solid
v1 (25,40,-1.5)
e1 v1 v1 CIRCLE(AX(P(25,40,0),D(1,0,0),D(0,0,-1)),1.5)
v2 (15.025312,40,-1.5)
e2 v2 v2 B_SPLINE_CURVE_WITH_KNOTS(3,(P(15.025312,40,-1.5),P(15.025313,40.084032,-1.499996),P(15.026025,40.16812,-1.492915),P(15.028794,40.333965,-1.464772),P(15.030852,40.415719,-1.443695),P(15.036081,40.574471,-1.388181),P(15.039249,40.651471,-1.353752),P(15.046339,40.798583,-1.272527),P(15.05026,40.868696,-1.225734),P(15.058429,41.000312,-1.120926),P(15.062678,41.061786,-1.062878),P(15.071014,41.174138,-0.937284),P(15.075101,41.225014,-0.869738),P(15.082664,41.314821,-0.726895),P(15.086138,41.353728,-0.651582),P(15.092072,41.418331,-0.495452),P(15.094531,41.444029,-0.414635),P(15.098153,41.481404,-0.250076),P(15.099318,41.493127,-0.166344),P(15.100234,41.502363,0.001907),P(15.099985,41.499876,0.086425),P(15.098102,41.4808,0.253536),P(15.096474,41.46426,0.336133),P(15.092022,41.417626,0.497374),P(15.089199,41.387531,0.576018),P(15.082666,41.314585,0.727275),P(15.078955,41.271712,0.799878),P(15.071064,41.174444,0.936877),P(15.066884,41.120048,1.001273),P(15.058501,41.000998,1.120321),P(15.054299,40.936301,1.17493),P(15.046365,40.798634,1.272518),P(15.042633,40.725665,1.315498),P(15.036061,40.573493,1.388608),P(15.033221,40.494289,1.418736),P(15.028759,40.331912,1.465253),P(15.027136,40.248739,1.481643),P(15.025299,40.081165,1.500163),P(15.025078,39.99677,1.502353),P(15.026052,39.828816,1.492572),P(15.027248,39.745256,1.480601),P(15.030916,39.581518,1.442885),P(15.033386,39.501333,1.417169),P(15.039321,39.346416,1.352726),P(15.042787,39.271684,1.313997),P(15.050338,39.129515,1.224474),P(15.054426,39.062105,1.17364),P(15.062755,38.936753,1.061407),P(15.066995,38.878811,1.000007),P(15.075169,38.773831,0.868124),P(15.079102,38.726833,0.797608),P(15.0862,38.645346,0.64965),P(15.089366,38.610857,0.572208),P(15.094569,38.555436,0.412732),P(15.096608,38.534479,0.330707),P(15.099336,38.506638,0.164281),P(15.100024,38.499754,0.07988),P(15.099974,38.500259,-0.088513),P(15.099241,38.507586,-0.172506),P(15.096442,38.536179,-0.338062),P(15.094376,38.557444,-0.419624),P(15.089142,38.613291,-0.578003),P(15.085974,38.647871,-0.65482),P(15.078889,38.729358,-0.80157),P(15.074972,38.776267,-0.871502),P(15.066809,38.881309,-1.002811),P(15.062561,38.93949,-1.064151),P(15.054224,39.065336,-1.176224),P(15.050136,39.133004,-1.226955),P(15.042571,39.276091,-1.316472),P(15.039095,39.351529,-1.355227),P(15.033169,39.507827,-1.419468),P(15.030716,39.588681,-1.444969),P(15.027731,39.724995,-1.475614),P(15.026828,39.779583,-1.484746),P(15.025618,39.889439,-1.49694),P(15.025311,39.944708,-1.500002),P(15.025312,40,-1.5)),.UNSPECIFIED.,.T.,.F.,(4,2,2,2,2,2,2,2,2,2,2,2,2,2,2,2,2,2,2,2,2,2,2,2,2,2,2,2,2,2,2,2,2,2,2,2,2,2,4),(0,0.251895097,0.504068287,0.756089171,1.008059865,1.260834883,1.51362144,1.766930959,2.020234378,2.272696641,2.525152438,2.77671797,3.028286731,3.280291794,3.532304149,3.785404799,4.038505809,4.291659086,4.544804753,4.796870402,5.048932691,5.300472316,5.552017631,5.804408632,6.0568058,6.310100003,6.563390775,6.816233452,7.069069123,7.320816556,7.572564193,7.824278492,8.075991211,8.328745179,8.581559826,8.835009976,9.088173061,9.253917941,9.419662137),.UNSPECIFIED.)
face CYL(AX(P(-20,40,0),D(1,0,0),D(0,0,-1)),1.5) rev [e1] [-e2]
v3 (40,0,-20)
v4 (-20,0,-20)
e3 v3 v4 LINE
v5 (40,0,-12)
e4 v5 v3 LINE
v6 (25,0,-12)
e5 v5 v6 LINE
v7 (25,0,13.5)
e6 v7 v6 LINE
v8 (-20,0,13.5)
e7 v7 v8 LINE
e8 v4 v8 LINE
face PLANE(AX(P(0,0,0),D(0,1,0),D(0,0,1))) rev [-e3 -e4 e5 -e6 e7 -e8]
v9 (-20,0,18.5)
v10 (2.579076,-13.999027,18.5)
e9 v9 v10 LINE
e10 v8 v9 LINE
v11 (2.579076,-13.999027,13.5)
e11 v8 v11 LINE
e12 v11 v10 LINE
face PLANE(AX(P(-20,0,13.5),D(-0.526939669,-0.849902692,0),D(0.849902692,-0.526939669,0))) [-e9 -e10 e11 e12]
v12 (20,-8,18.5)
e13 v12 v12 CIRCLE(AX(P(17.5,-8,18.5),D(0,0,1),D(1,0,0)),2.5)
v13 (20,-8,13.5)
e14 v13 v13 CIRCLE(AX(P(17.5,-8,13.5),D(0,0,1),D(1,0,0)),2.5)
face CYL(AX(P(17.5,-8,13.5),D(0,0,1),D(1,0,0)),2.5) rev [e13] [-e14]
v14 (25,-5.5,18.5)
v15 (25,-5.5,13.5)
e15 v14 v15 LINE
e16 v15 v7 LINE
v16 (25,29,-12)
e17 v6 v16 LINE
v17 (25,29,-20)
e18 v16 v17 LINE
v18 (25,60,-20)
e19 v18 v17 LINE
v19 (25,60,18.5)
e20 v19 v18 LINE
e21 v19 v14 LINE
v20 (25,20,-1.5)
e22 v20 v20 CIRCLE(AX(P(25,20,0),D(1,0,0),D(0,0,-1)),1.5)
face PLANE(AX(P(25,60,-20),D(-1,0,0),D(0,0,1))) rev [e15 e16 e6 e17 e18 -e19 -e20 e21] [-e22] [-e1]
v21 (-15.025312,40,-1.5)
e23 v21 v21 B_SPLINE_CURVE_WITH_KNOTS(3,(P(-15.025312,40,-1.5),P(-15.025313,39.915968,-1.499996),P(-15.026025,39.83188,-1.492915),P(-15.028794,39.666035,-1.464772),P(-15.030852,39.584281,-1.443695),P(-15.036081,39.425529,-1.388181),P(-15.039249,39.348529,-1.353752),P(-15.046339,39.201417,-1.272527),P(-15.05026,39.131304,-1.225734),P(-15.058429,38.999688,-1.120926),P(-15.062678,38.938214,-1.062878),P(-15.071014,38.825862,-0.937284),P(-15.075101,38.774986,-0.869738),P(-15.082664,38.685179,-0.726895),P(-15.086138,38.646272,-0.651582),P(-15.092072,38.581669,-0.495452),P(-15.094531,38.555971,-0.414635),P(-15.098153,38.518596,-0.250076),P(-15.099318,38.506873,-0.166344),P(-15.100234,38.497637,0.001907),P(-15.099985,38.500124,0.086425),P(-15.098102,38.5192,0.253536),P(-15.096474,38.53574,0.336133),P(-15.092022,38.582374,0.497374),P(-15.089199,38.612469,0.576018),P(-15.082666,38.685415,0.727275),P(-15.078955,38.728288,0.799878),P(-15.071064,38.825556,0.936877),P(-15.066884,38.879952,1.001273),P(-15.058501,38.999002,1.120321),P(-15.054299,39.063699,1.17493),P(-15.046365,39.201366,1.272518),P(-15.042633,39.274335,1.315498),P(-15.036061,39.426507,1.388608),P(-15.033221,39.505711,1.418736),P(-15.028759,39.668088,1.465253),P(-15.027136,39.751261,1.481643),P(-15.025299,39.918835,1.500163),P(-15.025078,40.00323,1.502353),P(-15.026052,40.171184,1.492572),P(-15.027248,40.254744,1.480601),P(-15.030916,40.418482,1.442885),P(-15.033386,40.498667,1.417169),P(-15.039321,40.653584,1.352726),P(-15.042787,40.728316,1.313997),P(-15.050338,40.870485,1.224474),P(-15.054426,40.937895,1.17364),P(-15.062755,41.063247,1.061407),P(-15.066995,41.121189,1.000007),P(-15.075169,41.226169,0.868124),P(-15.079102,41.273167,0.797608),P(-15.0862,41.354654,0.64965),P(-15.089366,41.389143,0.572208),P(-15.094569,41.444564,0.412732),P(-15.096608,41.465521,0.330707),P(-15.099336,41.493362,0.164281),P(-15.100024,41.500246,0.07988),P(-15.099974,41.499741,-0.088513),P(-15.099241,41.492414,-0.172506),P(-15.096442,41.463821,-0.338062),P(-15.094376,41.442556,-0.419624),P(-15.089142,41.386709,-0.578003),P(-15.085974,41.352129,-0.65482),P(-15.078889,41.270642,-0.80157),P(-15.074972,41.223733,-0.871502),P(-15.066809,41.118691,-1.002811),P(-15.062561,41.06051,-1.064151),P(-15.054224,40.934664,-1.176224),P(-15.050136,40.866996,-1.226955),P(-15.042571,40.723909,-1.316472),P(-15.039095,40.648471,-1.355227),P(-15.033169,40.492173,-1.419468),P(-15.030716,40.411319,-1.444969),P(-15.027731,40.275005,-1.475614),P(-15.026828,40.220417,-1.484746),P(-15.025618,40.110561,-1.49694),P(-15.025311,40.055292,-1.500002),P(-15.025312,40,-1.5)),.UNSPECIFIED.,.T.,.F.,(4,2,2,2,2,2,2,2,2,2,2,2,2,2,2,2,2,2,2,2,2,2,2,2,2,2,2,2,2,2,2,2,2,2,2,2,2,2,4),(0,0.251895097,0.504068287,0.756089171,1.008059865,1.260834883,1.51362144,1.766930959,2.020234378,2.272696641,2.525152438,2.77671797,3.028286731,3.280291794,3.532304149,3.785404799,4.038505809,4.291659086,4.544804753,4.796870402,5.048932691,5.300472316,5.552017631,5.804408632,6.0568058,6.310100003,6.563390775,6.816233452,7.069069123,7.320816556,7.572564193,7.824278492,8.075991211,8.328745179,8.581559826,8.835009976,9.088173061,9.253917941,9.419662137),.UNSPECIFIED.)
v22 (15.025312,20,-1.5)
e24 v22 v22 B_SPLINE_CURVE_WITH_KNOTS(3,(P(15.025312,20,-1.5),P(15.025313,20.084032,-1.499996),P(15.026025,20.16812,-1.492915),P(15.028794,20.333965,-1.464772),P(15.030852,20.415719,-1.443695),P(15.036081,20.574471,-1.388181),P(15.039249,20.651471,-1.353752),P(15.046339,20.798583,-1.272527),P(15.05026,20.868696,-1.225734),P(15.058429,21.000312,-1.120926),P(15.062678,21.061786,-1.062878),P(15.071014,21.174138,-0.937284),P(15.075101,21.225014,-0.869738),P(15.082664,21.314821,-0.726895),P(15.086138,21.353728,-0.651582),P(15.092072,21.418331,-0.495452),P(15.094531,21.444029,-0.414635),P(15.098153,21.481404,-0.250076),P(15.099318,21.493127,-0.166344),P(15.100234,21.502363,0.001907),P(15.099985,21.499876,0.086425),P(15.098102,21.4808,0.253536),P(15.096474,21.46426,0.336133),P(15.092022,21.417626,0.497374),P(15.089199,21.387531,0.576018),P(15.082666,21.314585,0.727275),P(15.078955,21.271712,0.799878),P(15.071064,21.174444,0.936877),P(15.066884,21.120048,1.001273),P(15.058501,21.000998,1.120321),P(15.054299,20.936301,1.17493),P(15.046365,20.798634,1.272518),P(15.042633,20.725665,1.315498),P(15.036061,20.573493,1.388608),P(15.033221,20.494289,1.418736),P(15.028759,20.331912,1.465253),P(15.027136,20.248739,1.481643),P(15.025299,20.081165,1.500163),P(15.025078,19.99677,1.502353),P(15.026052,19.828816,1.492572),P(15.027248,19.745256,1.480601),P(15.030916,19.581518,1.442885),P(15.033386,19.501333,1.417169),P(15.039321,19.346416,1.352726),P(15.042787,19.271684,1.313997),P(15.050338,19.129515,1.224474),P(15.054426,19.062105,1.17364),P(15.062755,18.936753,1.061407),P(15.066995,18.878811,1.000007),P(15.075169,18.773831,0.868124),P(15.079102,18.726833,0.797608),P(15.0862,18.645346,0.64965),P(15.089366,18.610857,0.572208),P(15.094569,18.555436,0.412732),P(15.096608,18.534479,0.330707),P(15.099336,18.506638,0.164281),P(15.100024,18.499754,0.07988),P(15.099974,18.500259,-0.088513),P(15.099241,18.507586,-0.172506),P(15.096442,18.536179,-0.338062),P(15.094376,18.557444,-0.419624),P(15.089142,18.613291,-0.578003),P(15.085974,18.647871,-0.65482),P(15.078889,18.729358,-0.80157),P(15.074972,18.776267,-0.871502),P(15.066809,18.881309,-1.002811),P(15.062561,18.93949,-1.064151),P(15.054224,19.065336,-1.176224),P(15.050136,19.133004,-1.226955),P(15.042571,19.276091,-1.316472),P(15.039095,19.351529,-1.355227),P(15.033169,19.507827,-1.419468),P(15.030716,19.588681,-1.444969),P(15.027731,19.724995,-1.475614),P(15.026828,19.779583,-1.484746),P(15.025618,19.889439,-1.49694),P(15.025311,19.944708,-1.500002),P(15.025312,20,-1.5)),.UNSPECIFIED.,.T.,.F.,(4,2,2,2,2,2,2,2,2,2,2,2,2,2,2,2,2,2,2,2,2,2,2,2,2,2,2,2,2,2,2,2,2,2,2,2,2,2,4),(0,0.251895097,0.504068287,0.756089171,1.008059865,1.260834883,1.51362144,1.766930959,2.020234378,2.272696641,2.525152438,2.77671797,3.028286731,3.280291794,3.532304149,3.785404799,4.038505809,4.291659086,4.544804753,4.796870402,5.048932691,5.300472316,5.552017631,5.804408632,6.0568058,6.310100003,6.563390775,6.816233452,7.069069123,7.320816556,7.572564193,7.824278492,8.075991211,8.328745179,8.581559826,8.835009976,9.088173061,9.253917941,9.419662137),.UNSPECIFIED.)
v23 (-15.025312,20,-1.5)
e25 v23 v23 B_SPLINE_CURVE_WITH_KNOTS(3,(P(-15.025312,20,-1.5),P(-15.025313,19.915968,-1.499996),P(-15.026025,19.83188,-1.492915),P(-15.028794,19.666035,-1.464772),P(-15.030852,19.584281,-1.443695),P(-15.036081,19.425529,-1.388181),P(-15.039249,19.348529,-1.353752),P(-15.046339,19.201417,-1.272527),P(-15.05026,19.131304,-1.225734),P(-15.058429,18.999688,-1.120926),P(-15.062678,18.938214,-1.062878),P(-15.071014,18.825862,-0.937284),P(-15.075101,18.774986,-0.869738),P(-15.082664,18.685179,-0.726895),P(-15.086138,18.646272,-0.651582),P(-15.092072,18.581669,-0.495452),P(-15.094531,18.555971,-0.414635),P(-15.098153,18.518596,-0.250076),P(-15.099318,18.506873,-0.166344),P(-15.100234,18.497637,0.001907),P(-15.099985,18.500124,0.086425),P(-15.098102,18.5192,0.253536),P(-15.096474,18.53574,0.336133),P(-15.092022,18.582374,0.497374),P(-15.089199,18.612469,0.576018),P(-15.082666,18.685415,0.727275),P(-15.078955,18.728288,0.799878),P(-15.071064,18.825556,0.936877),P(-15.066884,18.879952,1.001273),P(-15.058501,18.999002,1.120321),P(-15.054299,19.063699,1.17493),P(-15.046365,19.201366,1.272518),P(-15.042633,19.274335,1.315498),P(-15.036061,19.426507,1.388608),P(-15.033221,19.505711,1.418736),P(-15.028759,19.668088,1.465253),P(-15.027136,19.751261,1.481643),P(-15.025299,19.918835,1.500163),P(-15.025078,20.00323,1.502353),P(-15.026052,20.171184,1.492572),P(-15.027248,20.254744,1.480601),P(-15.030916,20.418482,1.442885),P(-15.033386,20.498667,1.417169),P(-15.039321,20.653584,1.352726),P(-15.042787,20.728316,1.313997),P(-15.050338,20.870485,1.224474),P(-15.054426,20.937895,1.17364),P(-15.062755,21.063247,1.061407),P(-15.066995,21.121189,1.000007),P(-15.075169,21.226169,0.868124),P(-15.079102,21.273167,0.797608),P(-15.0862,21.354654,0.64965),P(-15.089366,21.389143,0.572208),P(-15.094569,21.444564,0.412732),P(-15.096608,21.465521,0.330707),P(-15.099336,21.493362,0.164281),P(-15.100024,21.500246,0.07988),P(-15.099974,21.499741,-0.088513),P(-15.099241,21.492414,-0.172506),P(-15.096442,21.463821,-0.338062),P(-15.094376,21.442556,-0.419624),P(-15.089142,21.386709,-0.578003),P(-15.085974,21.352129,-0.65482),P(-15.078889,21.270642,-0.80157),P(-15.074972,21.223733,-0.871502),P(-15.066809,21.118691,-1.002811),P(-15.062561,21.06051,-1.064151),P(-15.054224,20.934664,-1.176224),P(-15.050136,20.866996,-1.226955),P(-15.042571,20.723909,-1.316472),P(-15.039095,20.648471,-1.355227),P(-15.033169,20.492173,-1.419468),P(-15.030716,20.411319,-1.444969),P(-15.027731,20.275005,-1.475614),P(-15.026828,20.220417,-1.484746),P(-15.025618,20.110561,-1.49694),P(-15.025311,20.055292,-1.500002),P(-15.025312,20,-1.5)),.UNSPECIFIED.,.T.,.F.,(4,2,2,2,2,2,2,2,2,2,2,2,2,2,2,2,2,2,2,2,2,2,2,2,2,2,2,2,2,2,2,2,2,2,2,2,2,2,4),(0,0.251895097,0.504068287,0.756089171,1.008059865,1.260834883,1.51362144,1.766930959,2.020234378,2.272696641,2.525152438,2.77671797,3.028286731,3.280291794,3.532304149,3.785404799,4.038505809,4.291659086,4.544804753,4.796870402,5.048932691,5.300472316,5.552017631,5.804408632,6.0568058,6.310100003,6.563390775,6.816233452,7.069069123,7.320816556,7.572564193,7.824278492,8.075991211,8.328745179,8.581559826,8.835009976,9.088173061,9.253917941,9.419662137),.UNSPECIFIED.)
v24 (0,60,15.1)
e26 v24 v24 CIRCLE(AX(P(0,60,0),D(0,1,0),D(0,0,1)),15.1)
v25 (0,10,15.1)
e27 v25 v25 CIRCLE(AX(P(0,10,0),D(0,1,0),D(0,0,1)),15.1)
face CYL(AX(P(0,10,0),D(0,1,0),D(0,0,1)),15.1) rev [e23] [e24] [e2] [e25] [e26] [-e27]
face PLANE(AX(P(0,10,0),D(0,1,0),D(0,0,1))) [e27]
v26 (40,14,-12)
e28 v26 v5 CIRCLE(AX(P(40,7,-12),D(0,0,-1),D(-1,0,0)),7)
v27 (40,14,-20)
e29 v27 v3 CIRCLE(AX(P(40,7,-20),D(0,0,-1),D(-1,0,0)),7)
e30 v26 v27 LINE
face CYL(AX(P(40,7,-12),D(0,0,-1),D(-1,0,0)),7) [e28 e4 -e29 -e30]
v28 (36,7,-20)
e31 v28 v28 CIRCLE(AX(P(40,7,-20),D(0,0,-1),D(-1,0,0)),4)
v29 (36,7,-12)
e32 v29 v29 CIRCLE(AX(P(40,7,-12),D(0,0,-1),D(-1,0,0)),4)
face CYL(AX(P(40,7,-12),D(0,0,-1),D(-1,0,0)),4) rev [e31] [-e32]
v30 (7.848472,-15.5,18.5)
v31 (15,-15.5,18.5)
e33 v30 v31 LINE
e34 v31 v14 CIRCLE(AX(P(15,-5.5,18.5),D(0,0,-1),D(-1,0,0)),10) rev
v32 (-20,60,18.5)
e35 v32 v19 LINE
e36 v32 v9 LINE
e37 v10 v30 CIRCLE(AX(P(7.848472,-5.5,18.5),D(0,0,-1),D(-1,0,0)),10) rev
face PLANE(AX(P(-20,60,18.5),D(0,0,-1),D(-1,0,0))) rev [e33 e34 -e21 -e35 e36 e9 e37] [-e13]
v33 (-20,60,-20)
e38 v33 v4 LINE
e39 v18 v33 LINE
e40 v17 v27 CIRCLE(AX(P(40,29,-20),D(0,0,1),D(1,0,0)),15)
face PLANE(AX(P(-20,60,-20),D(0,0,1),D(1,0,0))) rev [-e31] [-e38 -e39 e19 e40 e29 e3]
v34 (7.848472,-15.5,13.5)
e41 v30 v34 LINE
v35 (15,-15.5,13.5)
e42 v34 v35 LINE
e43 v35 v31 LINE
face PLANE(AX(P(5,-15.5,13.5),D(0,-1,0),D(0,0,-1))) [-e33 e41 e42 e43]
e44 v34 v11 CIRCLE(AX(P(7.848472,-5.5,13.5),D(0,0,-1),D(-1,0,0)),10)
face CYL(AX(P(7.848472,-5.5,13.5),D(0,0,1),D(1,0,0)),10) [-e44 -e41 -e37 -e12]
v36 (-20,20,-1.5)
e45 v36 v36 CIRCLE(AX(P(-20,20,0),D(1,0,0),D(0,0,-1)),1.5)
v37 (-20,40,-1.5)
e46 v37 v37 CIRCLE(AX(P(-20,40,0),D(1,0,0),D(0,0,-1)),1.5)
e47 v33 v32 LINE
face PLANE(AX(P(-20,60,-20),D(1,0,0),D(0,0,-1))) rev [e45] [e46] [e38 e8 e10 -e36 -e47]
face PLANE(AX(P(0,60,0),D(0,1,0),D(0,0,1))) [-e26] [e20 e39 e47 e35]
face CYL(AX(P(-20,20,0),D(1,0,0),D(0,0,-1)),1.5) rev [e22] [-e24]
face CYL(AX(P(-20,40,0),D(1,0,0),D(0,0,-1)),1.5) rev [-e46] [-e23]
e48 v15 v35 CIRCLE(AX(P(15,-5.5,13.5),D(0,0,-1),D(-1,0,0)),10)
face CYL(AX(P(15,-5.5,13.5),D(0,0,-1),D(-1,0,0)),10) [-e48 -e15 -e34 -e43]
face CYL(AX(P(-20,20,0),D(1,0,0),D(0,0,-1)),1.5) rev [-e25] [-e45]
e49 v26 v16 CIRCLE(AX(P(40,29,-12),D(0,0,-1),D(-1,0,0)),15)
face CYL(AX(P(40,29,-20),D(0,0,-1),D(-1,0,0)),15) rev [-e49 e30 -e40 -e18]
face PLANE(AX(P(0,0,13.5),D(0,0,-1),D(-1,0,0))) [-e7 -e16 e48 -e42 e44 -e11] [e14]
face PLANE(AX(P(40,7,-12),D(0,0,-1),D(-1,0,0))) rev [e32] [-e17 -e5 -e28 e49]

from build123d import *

# Parameters (mm, degrees)
SKETCH_1_W             = 45
SKETCH_1_H             = 38.5
EXTRUDE_1_DEPTH        = 60
SKETCH_2_R             = 15.1
CUT_EXTRUDE_1_DEPTH    = 50
SKETCH_3_R             = 2.5
EXTRUDE_2_DEPTH        = 5
SKETCH_4_R             = 1.5
CUT_EXTRUDE_2_DEPTH    = 78.620873481
PATTERN_LINEAR_1_COUNT = 2
PATTERN_LINEAR_1_PITCH = 20
FILLET_1_R             = 10
SKETCH_5_R             = 4
EXTRUDE_3_DEPTH        = 8
FILLET_2_R             = 15


with BuildPart() as part:
    # 草圖1 → 填料-伸長1 (new body)
    with BuildSketch(Plane(origin=(0, 0, 0), x_dir=(1, 0, 0), z_dir=(0, 1, 0))):
        with Locations((2.5, 0.75)):
            Rectangle(SKETCH_1_W, SKETCH_1_H)
    extrude(amount=EXTRUDE_1_DEPTH)

    # 草圖2 → 除料-伸長1 (cut)
    with BuildSketch(Plane(origin=(0, 60, 0), x_dir=(1, 0, 0), z_dir=(0, 1, 0))):
        with Locations(Location((0, 0, 0), (0, 0, 270))):
            Circle(SKETCH_2_R)
    extrude(amount=-CUT_EXTRUDE_1_DEPTH, mode=Mode.SUBTRACT)

    # 草圖3 → 填料-伸長2 (add)
    with BuildSketch(Plane.XY.offset(18.5)):
        Polygon((-20, 0), (5, -15.5), (25, -15.5), (25, 0), align=None)
        with Locations((17.5, -8)):
            Circle(SKETCH_3_R, mode=Mode.SUBTRACT)
    extrude(amount=-EXTRUDE_2_DEPTH)

    # 草圖4 → 除料-伸長2 (cut, through all)
    with BuildSketch(Plane(origin=(25, 0, 0), x_dir=(0, 0, -1), z_dir=(1, 0, 0))):
        with Locations((0, 20)):
            Circle(SKETCH_4_R)
    cut_extrude_2 = extrude(amount=-CUT_EXTRUDE_2_DEPTH, mode=Mode.SUBTRACT)

    # 直線複製排列1: 除料-伸長2 ×2
    with Locations(*[(0, i * PATTERN_LINEAR_1_PITCH, 0) for i in range(1, PATTERN_LINEAR_1_COUNT)]):
        add(cut_extrude_2, mode=Mode.SUBTRACT)

    # 圓角1
    fillet_1_edges = [part.edges().sort_by_distance(p)[0] for p in [
        (25, -15.5, 16),
        (5, -15.5, 16),
    ]]
    fillet(fillet_1_edges, radius=FILLET_1_R)

    # 草圖5 → 填料-伸長3 (add)
    with BuildSketch(Plane(origin=(0, 0, -20), x_dir=(-1, 0, 0), z_dir=(0, 0, -1))):
        with BuildLine():
            Line((-25, 0), (-40, 0))
            ThreePointArc((-40, 0), (-47, 7), (-40, 14))
            Line((-40, 14), (-25, 14))
            Line((-25, 14), (-25, 0))
        make_face()
        with Locations((-40, 7)):
            Circle(SKETCH_5_R, mode=Mode.SUBTRACT)
    extrude(amount=-EXTRUDE_3_DEPTH)

    # 圓角2
    fillet_2_edges = [part.edges().sort_by_distance(p)[0] for p in [
        (25, 14, -16),
    ]]
    fillet(fillet_2_edges, radius=FILLET_2_R - 0.0001)  # a hair under: the kernel refuses the full size


solid = part.part
